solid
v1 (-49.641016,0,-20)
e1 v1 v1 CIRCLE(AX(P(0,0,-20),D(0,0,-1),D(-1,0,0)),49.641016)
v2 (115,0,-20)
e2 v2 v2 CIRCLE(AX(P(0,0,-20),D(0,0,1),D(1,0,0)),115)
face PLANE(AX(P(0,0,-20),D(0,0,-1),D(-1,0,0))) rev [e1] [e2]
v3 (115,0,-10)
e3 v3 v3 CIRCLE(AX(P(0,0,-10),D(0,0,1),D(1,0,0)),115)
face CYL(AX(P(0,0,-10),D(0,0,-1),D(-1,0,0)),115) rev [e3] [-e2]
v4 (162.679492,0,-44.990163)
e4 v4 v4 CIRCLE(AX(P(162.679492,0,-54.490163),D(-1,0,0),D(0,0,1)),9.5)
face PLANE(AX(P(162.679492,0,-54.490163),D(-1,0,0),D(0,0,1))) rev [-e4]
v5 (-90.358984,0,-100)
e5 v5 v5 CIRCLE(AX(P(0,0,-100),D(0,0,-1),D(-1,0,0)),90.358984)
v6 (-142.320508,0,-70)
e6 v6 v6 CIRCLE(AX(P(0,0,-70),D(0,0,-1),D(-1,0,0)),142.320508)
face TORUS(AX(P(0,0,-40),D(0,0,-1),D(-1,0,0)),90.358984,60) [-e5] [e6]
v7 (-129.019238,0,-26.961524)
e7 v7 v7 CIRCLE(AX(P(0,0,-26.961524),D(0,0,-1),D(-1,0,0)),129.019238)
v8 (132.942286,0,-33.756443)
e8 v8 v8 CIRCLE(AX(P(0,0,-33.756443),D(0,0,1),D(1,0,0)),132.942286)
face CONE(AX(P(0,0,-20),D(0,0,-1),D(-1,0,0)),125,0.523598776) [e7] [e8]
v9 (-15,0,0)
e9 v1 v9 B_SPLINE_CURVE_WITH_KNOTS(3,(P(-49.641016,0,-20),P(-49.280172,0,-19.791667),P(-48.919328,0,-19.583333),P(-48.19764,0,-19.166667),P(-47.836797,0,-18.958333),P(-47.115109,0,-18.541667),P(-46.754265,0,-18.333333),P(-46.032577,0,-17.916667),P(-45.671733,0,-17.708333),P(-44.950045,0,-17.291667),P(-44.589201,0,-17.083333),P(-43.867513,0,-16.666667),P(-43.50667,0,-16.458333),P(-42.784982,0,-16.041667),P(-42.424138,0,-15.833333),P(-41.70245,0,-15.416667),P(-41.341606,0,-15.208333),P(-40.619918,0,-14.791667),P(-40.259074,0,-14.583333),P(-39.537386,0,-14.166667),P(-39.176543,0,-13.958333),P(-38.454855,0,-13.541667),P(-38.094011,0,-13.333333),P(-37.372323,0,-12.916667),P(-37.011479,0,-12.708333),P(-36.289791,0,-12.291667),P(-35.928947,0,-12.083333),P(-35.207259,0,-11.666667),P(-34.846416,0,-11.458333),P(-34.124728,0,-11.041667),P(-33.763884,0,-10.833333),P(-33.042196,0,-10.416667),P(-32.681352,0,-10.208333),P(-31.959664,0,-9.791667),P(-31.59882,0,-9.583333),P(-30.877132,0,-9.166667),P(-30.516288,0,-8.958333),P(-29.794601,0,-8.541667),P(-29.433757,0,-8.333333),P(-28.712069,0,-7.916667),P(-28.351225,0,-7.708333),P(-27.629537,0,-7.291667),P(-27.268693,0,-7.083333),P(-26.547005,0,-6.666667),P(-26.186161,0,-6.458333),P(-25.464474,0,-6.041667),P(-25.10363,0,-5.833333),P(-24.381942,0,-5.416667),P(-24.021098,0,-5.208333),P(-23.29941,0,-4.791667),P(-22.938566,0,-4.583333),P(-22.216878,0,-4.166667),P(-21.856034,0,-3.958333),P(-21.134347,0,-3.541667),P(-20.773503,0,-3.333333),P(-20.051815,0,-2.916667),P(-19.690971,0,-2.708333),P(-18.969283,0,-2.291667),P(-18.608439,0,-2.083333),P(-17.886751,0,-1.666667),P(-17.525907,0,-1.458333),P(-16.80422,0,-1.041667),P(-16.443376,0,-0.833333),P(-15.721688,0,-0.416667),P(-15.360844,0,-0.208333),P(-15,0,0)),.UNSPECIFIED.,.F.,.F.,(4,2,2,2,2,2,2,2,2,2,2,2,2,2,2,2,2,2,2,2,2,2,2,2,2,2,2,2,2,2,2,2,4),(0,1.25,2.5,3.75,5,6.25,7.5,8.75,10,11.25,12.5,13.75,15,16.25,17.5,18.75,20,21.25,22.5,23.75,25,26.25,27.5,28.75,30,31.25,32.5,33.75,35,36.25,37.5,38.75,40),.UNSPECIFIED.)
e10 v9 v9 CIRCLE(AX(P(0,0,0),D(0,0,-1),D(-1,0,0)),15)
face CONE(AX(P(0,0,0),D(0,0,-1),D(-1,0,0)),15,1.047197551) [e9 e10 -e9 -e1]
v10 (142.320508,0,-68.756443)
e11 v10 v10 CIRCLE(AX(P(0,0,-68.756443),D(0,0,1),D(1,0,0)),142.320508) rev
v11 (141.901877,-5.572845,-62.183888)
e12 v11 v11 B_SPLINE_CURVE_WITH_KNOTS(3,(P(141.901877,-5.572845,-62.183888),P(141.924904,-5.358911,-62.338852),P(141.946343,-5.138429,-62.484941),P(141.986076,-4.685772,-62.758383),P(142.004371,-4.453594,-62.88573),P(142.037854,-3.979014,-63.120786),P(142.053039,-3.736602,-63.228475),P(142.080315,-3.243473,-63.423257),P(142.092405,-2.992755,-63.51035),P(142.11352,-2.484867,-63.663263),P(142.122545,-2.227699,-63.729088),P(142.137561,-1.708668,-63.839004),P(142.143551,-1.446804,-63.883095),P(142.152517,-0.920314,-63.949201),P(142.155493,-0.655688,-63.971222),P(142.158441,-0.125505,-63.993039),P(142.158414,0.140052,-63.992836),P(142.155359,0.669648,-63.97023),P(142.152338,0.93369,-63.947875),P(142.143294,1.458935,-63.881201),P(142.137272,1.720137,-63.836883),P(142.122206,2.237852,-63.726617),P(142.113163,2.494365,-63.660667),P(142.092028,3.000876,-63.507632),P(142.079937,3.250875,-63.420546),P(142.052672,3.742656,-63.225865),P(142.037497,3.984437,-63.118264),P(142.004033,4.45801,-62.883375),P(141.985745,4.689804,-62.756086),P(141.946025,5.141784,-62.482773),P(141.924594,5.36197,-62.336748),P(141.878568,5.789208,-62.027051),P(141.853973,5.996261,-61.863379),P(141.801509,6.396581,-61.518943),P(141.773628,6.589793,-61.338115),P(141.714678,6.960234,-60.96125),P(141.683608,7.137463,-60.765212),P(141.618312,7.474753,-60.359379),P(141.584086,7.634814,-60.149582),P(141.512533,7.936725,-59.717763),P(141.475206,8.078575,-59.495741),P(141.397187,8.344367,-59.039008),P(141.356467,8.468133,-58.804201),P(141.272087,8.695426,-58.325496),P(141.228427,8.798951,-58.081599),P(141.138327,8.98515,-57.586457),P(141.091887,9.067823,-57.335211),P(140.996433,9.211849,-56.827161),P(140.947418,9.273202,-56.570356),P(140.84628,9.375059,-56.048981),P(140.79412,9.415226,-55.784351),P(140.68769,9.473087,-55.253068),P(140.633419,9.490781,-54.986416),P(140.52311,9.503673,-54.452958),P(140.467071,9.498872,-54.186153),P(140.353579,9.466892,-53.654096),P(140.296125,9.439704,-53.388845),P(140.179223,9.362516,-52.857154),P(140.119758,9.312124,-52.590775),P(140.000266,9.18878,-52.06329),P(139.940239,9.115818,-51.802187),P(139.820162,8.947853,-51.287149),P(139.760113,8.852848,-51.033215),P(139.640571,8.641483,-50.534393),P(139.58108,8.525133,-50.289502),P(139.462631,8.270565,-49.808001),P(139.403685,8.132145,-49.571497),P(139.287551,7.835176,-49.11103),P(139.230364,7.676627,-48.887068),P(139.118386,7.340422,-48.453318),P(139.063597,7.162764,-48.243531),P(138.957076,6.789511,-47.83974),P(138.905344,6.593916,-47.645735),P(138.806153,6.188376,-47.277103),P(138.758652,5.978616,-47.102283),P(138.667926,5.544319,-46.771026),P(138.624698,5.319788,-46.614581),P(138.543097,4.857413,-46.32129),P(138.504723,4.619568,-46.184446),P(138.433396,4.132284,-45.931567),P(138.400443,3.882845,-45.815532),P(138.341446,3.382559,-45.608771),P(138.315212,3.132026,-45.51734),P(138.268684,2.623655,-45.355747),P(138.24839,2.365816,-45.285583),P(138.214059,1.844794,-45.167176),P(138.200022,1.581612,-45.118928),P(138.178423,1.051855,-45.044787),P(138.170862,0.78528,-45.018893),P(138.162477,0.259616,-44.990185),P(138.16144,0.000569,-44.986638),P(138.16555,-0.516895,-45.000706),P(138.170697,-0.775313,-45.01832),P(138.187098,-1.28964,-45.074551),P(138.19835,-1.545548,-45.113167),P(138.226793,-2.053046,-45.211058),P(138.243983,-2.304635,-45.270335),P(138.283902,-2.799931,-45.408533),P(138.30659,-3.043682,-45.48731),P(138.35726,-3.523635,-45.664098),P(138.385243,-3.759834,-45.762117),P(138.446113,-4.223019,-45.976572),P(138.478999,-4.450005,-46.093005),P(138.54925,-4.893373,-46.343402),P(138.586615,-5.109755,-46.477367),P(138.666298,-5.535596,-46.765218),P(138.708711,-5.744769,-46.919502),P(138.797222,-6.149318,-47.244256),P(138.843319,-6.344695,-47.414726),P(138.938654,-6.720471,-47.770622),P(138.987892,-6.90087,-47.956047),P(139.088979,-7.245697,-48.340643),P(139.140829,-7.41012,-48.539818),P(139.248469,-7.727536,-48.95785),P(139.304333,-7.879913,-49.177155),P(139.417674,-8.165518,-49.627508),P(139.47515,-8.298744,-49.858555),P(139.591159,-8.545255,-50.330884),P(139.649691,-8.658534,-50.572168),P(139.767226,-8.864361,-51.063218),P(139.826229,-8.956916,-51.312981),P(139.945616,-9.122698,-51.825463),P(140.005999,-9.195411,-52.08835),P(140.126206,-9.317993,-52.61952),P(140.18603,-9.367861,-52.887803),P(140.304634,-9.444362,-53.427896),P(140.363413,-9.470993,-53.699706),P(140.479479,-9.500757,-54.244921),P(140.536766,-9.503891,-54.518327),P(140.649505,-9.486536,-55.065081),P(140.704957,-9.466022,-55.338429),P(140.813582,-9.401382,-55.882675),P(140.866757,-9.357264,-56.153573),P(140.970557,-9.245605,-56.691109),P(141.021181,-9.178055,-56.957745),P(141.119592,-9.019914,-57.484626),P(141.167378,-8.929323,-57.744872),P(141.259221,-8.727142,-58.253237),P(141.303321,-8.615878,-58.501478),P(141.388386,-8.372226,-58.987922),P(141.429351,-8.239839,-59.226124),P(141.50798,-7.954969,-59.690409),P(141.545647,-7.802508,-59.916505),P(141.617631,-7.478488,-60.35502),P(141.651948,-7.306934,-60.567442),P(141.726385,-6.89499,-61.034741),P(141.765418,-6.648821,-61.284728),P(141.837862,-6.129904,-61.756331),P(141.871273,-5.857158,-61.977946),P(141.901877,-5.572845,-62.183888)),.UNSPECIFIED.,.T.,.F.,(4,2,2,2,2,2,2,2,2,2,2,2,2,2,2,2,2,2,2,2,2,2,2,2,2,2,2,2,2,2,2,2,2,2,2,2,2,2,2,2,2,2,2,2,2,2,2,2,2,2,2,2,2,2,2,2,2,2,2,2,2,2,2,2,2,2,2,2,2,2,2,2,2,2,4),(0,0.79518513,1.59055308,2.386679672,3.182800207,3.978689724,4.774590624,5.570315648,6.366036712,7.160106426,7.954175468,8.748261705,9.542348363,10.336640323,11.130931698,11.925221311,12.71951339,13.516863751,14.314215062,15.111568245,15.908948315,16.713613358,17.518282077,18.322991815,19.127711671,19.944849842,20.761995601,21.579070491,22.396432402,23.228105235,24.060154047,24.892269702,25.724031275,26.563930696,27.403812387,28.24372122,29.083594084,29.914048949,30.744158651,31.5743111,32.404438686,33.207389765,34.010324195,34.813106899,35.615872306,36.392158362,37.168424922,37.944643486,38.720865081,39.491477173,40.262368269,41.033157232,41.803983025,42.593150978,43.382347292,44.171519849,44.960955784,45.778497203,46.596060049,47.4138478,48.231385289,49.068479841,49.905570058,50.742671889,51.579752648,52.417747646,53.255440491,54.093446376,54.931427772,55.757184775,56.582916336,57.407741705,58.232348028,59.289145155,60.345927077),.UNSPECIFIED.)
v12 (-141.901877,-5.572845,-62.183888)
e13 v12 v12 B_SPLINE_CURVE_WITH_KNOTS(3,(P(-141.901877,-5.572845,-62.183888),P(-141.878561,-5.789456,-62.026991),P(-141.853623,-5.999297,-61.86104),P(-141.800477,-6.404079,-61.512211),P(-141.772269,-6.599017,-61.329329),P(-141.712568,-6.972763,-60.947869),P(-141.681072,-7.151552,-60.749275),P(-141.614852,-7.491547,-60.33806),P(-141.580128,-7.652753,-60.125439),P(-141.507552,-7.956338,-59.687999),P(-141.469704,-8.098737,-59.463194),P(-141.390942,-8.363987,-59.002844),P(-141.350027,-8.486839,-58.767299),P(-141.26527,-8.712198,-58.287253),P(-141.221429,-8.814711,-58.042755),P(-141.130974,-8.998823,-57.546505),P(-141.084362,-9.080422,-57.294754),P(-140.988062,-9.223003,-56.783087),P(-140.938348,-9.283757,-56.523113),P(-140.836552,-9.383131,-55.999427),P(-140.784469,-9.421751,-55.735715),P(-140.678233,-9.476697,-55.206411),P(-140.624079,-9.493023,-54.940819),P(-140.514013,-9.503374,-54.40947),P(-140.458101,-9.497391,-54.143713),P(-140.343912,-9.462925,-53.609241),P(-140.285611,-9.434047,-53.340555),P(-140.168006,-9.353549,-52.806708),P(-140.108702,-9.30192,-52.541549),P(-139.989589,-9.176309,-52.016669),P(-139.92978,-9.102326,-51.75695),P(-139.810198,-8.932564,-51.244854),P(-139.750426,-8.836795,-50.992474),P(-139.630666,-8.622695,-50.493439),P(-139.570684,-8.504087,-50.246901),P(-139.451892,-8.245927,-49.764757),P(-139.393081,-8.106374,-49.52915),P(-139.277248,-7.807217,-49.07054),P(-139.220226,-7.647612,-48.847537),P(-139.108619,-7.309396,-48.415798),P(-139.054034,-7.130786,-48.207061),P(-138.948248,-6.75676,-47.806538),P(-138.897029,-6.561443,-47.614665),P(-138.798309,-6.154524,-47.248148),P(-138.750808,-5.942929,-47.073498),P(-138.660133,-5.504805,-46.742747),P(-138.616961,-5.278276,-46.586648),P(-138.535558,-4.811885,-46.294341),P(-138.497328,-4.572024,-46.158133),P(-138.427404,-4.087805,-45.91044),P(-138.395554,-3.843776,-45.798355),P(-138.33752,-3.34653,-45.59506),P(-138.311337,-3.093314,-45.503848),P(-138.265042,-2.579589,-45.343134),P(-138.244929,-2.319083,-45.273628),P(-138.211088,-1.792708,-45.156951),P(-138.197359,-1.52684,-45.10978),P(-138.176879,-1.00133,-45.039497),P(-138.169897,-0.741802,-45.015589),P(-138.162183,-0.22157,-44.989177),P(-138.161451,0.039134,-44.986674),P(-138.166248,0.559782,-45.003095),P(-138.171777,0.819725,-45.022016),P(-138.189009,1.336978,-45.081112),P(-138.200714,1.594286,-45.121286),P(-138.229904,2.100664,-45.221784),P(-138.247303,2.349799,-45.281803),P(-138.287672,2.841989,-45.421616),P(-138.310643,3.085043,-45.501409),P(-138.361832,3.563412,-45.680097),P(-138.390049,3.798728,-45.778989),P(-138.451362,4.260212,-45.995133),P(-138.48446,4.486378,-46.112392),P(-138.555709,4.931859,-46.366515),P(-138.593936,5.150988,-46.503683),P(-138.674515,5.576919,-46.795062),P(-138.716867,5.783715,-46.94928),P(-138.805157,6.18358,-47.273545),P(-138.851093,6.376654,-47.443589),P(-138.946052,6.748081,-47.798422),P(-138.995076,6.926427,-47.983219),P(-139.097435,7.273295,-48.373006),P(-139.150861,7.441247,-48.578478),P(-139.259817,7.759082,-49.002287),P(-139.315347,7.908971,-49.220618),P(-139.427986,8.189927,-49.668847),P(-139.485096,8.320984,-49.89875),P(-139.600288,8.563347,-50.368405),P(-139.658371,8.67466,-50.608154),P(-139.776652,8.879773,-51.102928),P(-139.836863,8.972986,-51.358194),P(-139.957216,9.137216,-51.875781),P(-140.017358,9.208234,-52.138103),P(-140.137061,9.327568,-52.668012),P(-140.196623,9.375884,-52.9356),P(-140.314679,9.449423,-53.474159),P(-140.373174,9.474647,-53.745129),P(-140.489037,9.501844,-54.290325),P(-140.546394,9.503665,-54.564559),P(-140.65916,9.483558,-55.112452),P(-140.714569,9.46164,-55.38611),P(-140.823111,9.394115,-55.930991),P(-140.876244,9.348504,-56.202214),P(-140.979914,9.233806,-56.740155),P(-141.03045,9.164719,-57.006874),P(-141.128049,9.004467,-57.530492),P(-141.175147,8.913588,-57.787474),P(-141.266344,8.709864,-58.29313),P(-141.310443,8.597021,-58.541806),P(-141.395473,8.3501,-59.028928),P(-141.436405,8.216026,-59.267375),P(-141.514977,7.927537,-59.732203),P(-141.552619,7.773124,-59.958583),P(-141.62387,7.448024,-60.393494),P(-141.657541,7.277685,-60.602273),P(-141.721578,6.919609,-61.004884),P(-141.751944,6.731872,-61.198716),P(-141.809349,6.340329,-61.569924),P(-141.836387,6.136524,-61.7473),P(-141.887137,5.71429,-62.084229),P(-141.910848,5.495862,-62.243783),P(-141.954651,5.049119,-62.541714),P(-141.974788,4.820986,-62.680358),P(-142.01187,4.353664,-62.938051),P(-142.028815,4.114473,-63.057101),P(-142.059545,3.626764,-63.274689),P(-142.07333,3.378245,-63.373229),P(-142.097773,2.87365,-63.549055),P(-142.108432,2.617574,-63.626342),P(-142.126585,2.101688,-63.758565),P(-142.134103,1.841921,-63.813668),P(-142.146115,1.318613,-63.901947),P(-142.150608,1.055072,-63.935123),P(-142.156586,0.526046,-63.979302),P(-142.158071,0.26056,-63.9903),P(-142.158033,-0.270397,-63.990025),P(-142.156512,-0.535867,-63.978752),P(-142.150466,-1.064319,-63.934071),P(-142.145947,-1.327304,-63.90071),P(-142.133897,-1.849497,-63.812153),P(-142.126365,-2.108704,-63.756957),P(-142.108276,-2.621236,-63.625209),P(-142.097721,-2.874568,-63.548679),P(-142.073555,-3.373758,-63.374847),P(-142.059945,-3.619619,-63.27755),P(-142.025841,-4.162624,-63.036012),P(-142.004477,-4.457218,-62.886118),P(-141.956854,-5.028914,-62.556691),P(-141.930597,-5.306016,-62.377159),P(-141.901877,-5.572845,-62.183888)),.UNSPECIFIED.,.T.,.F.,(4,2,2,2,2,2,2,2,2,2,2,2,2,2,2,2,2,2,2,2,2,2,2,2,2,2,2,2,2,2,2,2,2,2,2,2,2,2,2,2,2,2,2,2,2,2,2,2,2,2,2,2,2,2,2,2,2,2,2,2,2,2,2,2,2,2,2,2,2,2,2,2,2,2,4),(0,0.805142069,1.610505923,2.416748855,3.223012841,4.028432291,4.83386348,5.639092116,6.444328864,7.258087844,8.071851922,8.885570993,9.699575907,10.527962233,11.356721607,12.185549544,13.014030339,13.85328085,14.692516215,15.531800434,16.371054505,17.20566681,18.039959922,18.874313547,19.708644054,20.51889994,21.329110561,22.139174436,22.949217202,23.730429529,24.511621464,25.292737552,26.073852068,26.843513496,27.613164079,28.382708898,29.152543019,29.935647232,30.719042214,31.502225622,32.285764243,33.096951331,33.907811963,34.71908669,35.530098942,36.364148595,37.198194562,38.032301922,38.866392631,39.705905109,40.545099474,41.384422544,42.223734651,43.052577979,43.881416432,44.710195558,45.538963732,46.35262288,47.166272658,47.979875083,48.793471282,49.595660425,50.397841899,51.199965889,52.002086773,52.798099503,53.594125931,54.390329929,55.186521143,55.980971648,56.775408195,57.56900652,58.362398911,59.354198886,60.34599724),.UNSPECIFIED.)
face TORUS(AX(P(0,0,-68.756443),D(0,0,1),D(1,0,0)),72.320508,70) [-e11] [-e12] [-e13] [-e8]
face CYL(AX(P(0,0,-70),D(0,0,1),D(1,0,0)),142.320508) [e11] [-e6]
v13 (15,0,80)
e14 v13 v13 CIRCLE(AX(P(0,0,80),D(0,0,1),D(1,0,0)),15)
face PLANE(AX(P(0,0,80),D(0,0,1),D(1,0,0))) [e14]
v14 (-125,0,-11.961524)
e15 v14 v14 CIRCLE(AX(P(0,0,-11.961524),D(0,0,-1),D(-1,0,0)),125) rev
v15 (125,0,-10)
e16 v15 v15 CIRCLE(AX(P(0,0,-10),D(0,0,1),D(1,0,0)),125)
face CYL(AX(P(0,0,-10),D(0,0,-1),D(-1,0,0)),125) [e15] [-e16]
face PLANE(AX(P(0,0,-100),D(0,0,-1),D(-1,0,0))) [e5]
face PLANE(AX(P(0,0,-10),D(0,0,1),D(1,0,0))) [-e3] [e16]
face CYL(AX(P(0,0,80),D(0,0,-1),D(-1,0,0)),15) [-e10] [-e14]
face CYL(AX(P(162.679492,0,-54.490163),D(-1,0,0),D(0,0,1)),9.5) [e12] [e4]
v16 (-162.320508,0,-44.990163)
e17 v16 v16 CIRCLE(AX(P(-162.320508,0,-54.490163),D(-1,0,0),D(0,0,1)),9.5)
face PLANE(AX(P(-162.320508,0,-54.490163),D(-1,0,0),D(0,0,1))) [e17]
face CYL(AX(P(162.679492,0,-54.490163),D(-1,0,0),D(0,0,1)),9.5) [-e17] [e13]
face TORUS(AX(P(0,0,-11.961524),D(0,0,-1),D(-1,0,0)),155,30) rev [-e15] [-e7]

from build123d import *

# Parameters (mm, degrees)
SKETCH1_R                = 15
BOSS_EXTRUDE1_DEPTH      = 80
SKETCH2_R                = 15
BOSS_EXTRUDE2_DEPTH      = 20
BOSS_EXTRUDE2_DRAFT      = -60
SKETCH3_R                = 125
BOSS_EXTRUDE5_DEPTH      = 30
BOSS_EXTRUDE5_DRAFT      = -30
SKETCH6_R                = 125
SKETCH6_R_2              = 115
BOSS_EXTRUDE6_DEPTH      = 10
SKETCH7_R                = 142.320508076
BOSS_EXTRUDE7_DEPTH      = 20
SKETCH9_R                = 142.320508076
BOSS_EXTRUDE8_DEPTH      = 30
BOSS_EXTRUDE8_TAPER      = 30
FILLET1_R                = 60
FILLET3_R                = 70
FILLET4_R                = 30
BOSS_EXTRUDE9_DEPTH      = 20
BOSS_EXTRUDE9_DEPTH_BACK = 305
SKETCH10_R               = 9.5


with BuildPart() as part:
    # Sketch1 → Boss-Extrude1 (new body)
    with BuildSketch(Plane.XY):
        Circle(SKETCH1_R)
    extrude(amount=BOSS_EXTRUDE1_DEPTH)


with BuildPart() as boss_extrude2_tool:
    # Sketch2 → Boss-Extrude2 (with draft: the straight prism first)
    with BuildSketch(Plane(origin=(0, 0, 0), x_dir=(-1, 0, 0), z_dir=(0, 0, -1))):
        Circle(SKETCH2_R)
    extrude(amount=BOSS_EXTRUDE2_DEPTH)
    # Boss-Extrude2: the draft: its side faces are tilted about the plane it starts from
    boss_extrude2_sides = [boss_extrude2_tool.faces().sort_by_distance(p)[0] for p in [
        (15, 0, -10),
    ]]
    draft(boss_extrude2_sides, Plane(origin=(0, 0, 0), x_dir=(-1, 0, 0), z_dir=(0, 0, -1)), BOSS_EXTRUDE2_DRAFT)


with BuildPart() as part_1:
    add(part.part)

    # Boss-Extrude2: add boss_extrude2_tool
    add(boss_extrude2_tool.part)


with BuildPart() as boss_extrude5_tool:
    # Sketch3 → Boss-Extrude5 (with draft: the straight prism first)
    with BuildSketch(Plane(origin=(0, 0, -20), x_dir=(-1, 0, 0), z_dir=(0, 0, -1))):
        Circle(SKETCH3_R)
    extrude(amount=BOSS_EXTRUDE5_DEPTH)
    # Boss-Extrude5: the draft: its side faces are tilted about the plane it starts from
    boss_extrude5_sides = [boss_extrude5_tool.faces().sort_by_distance(p)[0] for p in [
        (125, 0, -35),
    ]]
    draft(boss_extrude5_sides, Plane(origin=(0, 0, -20), x_dir=(-1, 0, 0), z_dir=(0, 0, -1)), BOSS_EXTRUDE5_DRAFT)


with BuildPart() as part_2:
    add(part_1.part)

    # Boss-Extrude5: add boss_extrude5_tool
    add(boss_extrude5_tool.part)

    # Sketch6 → Boss-Extrude6 (add)
    with BuildSketch(Plane.XY.offset(-20)):
        Circle(SKETCH6_R)
        Circle(SKETCH6_R_2, mode=Mode.SUBTRACT)
    extrude(amount=BOSS_EXTRUDE6_DEPTH)

    # Sketch7 → Boss-Extrude7 (add)
    with BuildSketch(Plane(origin=(0, 0, -50), x_dir=(-1, 0, 0), z_dir=(0, 0, -1))):
        Circle(SKETCH7_R)
    extrude(amount=BOSS_EXTRUDE7_DEPTH)

    # Sketch9 → Boss-Extrude8 (add)
    with BuildSketch(Plane(origin=(0, 0, -70), x_dir=(-1, 0, 0), z_dir=(0, 0, -1))):
        Circle(SKETCH9_R)
    extrude(amount=BOSS_EXTRUDE8_DEPTH, taper=BOSS_EXTRUDE8_TAPER)

    # Fillet1
    fillet1_edges = [part_2.edges().sort_by_distance(p)[0] for p in [
        (125, 0, -100),
    ]]
    fillet(fillet1_edges, radius=FILLET1_R - 0.0001)  # a hair under: the kernel refuses the full size

    # Fillet3
    fillet3_edges = [part_2.edges().sort_by_distance(p)[0] for p in [
        (142.320508076, 0, -50),
    ]]
    fillet(fillet3_edges, radius=FILLET3_R)

    # Fillet4
    fillet4_edges = [part_2.edges().sort_by_distance(p)[0] for p in [
        (0, -125, -20),
    ]]
    fillet(fillet4_edges, radius=FILLET4_R)

    # Sketch10 → Boss-Extrude9 (add, two sides: drawn at the far end of the back side and taken through both)
    with BuildSketch(Plane.ZY.offset(142.320508076).offset(-BOSS_EXTRUDE9_DEPTH_BACK)):
        with Locations((-54.490163429, 0)):
            Circle(SKETCH10_R)
    extrude(amount=BOSS_EXTRUDE9_DEPTH + BOSS_EXTRUDE9_DEPTH_BACK)


solid = part_2.part
